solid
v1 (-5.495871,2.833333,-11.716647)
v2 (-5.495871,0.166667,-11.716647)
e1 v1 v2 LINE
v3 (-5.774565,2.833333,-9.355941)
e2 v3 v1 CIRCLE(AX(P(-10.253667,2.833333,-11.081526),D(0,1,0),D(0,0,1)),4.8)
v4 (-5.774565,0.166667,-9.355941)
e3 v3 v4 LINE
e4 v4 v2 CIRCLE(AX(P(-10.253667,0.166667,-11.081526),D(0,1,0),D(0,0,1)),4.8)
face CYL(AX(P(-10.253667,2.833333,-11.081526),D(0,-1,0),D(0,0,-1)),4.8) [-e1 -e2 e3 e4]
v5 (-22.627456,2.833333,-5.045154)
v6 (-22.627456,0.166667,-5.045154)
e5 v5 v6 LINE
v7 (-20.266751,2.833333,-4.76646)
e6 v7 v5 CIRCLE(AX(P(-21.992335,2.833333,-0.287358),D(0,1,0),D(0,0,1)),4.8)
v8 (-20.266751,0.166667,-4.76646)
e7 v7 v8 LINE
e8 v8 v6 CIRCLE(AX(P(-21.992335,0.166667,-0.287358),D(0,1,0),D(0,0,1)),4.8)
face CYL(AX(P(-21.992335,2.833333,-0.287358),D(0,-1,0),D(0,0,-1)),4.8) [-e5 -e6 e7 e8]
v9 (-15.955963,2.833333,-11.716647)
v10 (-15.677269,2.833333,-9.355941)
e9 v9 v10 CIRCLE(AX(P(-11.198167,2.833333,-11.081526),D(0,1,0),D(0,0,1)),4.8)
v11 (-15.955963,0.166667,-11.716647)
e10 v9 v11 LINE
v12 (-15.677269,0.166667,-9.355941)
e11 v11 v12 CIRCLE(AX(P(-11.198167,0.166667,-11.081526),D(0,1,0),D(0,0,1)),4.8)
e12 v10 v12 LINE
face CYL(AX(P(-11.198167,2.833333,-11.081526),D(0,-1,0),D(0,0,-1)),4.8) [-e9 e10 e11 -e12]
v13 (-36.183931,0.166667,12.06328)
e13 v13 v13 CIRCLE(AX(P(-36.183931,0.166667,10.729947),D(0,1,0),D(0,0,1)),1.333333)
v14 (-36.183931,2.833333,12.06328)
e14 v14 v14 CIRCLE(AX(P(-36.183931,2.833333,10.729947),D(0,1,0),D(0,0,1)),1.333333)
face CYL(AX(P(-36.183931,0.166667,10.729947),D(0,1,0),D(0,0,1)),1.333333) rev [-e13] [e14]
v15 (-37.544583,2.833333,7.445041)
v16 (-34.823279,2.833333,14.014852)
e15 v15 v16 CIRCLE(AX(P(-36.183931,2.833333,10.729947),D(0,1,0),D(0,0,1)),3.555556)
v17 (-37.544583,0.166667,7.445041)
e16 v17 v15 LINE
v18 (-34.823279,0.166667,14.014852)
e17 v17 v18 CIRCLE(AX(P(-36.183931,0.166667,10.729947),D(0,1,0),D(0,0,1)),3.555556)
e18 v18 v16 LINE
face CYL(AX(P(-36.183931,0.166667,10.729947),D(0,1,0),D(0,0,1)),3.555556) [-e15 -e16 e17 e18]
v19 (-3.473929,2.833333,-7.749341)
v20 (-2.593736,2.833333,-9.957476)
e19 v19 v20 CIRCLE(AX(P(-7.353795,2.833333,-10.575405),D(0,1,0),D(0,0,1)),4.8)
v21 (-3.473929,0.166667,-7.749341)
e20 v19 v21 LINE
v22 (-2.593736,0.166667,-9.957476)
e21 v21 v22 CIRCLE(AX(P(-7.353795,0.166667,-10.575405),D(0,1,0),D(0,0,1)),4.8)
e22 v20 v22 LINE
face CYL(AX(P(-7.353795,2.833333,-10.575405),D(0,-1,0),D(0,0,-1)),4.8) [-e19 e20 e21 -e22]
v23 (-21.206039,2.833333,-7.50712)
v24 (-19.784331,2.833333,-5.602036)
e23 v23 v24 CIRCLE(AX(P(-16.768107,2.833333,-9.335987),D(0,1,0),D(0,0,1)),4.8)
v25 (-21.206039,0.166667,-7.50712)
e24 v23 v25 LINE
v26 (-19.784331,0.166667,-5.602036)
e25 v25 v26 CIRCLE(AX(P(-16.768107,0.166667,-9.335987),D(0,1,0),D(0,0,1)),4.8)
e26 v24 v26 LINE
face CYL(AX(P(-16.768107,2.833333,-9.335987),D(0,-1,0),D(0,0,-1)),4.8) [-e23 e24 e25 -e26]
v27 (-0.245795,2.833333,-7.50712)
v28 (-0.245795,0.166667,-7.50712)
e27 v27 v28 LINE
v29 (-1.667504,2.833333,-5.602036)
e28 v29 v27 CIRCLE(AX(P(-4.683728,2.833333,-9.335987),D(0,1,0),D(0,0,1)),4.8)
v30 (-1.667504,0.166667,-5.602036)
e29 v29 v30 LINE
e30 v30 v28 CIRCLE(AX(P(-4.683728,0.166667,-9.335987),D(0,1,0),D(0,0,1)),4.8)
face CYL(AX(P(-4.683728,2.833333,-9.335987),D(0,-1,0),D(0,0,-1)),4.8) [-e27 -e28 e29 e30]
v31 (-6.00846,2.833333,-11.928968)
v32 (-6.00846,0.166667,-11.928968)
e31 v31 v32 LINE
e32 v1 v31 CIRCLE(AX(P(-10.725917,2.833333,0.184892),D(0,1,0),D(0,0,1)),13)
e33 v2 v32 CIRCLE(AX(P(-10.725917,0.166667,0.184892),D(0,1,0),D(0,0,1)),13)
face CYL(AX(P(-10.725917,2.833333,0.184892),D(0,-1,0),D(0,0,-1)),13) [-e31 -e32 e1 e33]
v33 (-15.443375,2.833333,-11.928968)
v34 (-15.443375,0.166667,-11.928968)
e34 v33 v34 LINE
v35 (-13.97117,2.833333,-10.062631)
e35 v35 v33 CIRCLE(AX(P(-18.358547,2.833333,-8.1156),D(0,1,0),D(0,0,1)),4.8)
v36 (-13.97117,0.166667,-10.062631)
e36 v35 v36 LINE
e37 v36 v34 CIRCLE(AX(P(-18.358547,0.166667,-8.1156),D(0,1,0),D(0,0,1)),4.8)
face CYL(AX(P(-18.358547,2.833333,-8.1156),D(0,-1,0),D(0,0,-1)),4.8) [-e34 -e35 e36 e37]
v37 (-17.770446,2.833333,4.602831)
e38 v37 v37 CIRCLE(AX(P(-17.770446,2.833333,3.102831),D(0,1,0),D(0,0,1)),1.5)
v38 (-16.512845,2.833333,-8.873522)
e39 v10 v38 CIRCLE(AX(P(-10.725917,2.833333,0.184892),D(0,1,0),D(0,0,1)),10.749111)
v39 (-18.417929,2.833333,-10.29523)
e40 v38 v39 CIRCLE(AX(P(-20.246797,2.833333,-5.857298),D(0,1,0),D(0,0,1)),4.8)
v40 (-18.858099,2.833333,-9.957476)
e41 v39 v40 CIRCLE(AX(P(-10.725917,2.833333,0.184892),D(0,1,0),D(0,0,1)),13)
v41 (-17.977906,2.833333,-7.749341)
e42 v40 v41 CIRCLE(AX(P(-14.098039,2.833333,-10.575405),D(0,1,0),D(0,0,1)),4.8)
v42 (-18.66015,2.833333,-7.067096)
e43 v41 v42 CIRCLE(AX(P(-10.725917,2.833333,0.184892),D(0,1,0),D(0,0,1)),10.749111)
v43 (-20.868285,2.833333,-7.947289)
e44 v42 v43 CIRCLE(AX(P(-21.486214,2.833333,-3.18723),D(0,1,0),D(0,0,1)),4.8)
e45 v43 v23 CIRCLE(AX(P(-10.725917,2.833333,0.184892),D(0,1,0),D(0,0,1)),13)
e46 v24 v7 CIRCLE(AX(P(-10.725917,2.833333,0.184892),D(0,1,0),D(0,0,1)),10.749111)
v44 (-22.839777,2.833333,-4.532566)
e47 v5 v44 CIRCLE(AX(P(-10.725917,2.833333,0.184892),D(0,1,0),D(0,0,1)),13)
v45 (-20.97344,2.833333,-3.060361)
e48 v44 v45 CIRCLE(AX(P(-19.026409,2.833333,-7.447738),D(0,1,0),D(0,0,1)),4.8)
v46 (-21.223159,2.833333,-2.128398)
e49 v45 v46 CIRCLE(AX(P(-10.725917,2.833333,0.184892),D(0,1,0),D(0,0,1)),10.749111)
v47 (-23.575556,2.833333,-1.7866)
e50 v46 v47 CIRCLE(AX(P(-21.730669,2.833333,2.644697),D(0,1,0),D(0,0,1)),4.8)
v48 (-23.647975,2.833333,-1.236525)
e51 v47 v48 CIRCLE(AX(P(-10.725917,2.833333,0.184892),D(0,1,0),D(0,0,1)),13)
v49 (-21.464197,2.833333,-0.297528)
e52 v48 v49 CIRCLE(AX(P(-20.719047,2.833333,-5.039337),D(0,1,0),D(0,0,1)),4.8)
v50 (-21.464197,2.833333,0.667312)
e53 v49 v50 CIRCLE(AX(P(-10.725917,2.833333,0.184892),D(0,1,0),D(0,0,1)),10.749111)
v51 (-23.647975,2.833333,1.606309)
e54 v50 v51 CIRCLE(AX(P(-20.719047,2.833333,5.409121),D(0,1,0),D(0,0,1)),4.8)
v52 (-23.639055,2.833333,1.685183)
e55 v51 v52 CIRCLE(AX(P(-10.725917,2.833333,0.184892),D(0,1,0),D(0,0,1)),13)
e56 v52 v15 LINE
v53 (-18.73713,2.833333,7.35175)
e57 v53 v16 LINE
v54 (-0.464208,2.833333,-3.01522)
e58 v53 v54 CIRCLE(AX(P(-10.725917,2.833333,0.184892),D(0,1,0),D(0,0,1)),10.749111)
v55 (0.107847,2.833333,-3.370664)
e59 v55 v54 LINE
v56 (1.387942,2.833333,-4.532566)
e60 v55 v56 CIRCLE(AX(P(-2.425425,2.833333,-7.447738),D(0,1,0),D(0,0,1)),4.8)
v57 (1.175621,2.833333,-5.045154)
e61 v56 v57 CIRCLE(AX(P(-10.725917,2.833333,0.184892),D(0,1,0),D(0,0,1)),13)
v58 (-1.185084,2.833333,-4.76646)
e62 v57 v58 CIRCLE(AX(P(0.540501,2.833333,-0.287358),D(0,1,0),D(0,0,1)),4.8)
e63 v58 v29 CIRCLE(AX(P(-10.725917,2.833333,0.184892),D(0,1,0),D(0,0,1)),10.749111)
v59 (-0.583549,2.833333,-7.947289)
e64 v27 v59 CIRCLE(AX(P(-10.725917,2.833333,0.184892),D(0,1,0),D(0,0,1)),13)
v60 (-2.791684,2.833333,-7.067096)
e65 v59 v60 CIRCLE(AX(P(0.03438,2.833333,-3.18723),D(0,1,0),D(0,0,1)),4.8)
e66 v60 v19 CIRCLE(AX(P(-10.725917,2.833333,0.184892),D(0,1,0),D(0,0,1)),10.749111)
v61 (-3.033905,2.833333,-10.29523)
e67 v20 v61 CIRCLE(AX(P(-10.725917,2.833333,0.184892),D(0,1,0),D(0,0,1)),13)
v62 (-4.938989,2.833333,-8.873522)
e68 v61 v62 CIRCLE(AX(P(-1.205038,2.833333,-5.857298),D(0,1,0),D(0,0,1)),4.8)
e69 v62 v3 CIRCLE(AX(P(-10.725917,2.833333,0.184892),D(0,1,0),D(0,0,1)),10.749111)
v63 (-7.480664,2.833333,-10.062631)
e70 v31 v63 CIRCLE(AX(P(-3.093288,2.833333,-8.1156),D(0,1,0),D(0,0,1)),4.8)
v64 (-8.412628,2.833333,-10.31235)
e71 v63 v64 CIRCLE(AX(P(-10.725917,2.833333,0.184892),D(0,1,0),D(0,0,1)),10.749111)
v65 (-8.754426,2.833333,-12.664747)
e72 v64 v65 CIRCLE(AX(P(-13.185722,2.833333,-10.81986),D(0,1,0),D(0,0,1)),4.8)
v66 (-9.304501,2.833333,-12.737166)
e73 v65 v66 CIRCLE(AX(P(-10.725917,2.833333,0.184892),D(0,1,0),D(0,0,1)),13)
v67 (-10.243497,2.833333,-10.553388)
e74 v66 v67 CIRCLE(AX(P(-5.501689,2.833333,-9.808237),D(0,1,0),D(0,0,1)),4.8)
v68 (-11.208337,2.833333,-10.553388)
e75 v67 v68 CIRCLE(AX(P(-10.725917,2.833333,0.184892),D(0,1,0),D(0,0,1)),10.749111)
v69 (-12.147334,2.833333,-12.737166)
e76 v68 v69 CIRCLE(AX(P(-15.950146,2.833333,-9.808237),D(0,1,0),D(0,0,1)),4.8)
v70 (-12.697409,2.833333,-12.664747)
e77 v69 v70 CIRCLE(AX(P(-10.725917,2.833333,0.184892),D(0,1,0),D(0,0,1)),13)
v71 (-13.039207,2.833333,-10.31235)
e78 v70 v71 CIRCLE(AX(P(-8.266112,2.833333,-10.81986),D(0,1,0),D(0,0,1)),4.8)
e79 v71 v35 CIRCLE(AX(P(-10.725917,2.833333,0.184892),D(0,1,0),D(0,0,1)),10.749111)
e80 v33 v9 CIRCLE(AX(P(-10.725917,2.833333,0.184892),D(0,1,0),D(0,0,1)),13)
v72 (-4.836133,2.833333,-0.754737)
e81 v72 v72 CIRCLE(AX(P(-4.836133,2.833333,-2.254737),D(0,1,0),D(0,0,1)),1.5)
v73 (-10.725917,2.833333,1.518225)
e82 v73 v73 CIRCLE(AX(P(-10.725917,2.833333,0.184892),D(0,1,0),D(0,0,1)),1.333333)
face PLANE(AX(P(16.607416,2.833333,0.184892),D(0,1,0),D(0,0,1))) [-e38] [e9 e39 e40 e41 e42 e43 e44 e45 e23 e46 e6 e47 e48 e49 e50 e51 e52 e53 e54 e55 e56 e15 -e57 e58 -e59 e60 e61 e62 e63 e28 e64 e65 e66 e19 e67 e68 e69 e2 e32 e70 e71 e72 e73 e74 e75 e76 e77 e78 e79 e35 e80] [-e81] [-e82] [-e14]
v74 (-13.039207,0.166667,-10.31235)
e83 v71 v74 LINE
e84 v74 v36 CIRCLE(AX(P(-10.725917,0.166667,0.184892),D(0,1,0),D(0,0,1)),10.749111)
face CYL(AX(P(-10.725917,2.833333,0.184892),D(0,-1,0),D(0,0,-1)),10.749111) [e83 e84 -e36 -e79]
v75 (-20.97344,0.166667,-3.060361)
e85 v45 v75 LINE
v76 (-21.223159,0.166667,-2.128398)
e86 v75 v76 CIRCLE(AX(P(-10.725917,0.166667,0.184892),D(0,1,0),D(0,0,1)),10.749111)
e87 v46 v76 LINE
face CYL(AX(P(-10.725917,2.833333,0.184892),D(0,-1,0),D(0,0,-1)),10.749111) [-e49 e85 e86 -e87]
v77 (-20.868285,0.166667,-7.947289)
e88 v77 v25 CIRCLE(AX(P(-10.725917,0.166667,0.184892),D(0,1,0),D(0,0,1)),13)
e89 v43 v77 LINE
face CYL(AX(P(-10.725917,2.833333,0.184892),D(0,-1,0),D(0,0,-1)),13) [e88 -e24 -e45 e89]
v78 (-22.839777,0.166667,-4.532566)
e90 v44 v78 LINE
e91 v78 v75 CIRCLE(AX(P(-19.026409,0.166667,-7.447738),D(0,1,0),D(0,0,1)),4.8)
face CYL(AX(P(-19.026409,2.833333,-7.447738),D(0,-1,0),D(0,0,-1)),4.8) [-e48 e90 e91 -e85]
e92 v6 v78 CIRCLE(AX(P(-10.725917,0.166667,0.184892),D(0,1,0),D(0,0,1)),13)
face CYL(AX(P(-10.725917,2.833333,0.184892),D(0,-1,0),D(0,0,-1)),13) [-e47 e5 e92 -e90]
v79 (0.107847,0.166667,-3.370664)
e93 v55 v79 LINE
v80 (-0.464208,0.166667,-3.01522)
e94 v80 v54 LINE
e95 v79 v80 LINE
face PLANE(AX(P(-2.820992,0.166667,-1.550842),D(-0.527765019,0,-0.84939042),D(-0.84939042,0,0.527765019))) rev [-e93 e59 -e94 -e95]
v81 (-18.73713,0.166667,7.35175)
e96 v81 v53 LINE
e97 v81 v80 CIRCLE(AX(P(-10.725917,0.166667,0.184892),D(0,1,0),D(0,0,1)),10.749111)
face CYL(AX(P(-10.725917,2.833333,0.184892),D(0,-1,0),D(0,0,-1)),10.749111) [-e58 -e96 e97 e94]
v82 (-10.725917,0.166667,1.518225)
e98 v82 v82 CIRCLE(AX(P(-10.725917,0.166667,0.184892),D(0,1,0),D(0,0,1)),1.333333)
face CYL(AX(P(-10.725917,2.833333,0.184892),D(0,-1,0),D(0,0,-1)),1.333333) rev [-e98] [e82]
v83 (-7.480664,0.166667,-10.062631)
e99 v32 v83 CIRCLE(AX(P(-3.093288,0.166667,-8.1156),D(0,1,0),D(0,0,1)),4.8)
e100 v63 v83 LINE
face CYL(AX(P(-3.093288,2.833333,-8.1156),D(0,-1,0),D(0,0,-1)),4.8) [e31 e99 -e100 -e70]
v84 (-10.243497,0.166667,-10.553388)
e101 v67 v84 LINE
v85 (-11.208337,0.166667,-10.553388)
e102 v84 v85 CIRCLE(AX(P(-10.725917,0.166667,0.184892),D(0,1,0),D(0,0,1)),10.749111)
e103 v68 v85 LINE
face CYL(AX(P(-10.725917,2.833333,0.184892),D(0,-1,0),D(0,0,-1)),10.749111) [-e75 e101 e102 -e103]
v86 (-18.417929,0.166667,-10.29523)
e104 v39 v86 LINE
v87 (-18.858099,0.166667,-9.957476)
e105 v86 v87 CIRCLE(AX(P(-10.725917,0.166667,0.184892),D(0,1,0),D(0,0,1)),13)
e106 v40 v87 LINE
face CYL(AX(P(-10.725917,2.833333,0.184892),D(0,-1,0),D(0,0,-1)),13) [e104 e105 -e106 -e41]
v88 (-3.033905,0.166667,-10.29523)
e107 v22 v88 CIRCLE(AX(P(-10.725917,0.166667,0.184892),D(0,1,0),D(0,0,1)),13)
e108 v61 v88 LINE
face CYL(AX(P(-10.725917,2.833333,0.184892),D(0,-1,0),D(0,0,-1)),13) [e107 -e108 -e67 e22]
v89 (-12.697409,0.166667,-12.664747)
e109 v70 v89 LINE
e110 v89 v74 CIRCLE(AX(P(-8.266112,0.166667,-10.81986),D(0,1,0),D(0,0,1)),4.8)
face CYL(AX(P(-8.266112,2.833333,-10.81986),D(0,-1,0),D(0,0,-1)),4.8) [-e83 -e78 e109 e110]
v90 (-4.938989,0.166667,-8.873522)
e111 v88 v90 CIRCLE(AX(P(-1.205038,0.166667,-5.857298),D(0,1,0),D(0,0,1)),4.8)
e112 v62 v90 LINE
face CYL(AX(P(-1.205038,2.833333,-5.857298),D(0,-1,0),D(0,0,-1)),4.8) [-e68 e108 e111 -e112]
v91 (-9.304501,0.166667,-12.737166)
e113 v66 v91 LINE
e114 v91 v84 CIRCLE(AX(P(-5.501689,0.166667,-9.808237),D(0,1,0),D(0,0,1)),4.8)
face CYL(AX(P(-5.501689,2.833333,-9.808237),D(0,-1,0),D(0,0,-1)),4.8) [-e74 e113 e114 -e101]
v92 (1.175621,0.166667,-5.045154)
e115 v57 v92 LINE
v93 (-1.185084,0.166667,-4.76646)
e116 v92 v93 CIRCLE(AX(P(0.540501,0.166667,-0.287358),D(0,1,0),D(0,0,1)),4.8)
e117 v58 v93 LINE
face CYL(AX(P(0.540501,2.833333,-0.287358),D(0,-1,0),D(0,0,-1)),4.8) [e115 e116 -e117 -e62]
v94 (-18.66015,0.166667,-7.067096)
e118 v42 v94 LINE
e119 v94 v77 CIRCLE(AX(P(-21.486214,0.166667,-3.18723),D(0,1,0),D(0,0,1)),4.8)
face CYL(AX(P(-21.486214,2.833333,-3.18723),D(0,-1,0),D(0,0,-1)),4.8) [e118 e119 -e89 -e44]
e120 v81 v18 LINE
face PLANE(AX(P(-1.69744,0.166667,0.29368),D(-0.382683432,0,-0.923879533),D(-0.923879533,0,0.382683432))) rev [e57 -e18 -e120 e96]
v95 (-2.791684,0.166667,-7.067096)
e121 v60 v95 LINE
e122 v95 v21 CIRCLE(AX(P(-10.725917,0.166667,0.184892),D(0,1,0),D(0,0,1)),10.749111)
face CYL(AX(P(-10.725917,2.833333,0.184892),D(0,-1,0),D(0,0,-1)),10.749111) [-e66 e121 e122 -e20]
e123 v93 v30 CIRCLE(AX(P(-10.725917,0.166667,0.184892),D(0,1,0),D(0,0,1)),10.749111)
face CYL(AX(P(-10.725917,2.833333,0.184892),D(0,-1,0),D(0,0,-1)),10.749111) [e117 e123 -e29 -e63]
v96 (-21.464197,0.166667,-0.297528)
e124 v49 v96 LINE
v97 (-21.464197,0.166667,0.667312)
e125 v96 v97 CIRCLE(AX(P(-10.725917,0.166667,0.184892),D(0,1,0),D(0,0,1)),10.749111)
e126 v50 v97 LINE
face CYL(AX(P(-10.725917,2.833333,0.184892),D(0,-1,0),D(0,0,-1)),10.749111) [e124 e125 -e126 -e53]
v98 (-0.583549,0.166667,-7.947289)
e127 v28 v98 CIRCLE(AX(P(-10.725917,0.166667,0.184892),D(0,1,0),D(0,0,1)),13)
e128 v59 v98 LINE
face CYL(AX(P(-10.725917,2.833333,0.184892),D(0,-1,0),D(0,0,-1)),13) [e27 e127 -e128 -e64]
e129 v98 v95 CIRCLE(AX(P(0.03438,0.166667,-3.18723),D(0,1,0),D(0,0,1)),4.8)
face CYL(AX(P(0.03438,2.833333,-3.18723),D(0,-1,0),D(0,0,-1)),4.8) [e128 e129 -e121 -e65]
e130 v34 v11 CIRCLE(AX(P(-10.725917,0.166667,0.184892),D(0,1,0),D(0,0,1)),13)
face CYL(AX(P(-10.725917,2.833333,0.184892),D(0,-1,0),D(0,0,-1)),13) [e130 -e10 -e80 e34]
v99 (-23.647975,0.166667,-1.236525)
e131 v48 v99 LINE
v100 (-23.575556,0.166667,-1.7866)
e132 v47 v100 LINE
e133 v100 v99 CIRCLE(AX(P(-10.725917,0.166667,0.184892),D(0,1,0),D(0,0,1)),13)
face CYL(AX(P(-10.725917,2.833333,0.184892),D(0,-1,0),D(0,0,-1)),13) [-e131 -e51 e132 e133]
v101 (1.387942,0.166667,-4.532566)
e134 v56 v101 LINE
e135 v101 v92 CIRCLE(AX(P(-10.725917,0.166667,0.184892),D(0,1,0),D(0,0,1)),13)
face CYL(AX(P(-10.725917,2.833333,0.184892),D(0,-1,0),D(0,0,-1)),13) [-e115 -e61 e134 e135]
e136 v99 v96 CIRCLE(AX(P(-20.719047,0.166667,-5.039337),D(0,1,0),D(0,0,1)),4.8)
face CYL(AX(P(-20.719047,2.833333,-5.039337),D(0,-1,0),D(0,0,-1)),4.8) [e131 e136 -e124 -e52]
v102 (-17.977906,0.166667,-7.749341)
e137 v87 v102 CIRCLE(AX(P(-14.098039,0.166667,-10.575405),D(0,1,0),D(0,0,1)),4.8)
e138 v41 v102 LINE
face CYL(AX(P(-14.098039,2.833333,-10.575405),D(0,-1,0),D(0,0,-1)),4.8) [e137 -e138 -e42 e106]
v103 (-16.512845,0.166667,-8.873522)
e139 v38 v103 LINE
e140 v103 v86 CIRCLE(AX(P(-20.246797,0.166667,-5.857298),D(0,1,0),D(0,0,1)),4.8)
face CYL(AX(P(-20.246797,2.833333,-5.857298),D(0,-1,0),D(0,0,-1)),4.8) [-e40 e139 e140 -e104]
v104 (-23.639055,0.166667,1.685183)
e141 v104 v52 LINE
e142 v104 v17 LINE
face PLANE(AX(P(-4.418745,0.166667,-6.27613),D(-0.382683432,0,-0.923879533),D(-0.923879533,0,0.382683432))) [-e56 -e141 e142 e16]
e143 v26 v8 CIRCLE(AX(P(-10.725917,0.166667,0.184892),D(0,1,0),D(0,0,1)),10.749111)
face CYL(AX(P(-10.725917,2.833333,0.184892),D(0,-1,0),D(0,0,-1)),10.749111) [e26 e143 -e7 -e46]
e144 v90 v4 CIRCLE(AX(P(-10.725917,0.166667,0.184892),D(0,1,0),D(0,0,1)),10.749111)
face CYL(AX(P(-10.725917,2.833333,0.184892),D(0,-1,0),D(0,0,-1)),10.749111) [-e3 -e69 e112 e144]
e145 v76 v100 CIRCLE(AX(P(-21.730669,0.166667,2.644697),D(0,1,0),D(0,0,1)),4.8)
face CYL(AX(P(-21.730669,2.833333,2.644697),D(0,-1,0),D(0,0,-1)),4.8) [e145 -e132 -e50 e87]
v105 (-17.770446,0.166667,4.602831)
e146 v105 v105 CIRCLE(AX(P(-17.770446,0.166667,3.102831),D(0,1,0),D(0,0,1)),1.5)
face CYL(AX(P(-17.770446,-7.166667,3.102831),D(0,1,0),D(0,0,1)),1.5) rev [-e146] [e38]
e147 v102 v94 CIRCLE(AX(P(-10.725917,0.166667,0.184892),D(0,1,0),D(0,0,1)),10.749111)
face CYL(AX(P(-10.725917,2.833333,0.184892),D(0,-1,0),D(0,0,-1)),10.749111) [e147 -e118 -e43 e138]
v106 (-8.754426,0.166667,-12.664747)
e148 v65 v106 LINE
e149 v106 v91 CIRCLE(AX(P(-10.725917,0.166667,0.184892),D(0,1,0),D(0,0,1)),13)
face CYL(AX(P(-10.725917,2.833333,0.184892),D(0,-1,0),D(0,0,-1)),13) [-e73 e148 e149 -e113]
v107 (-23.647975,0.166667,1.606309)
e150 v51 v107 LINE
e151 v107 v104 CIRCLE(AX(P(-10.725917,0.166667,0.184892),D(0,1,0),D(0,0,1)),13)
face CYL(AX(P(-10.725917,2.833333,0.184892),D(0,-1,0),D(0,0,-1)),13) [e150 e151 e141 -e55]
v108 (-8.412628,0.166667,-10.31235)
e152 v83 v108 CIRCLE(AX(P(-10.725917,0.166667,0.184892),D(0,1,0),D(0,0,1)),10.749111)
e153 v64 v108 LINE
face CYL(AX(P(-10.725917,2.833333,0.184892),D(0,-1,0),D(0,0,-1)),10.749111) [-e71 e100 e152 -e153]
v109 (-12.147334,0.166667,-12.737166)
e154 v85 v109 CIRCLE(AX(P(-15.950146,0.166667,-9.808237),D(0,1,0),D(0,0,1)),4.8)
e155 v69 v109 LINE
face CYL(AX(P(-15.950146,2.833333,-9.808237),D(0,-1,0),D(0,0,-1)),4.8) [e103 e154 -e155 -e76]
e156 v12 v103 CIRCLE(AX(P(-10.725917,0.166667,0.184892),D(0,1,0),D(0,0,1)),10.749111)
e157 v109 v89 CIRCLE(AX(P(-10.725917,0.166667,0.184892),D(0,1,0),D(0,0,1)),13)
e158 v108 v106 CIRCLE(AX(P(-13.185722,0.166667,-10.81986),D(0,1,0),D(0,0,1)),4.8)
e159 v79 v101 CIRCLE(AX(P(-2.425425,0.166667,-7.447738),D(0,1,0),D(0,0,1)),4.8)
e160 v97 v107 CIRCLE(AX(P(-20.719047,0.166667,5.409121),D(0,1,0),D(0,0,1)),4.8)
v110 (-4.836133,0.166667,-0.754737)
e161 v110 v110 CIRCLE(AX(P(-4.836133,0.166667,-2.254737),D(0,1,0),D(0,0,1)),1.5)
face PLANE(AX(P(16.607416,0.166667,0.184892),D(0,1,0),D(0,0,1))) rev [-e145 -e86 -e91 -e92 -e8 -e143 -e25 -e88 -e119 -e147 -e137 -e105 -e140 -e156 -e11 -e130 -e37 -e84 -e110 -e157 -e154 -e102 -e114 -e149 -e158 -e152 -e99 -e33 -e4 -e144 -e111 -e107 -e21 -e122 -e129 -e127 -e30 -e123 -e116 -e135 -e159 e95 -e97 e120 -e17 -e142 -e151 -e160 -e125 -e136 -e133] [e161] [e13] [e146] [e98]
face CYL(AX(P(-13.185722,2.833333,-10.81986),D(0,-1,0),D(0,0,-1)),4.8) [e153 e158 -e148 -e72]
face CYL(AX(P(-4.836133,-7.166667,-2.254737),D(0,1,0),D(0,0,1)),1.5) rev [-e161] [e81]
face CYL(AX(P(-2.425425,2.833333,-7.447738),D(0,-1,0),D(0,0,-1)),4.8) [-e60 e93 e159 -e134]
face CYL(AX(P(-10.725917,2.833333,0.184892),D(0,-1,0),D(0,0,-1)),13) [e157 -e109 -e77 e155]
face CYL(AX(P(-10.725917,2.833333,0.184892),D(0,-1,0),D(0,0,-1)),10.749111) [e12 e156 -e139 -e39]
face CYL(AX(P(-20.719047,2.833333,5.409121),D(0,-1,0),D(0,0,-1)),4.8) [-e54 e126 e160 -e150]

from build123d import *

# Parameters (mm, degrees)
SKETCH1_R              = 1.5
BOSS_EXTRUDE1_DEPTH    = 3
SKETCH3_R              = 1.5
BOSS_EXTRUDE2_DEPTH    = 3
CUT_EXTRUDE1_OUTLINE_R = 1.5
CUT_EXTRUDE1_DEPTH     = 3
SCALE1_SCALE           = 0.888888889
BOSS_EXTRUDE3_START    = -2.666666667
SKETCH5_R              = 1.333333333
BOSS_EXTRUDE3_DEPTH    = 2.666666667
SKETCH6_R              = 1.5
CUT_EXTRUDE2_DEPTH     = 10


# Read off the part's stored shape, not the designer's step: Cut-Extrude1
with BuildPart() as part:
    # Sketch1 → Boss-Extrude1 (new body)
    with BuildSketch(Plane(origin=(0, 0, 0), x_dir=(1, 0, 0), z_dir=(0, 1, 0))):
        with BuildLine():
            Line((20.643657446, 4), (2.081641936, 4))
            ThreePointArc((2.081641936, 4), (2.861028333, 4.588201733), (3.521749436, 5.30713988))
            ThreePointArc((3.521749436, 5.30713988), (3.405395609, 5.596745198), (3.282888305, 5.883801663))
            ThreePointArc((3.282888305, 5.883801663), (1.93527598, 5.894040025), (0.627094961, 5.57027124))
            ThreePointArc((0.627094961, 5.57027124), (0.366286148, 6.046375), (0.084372603, 6.510293938))
            ThreePointArc((0.084372603, 6.510293938), (1.018855105, 7.48132754), (1.683794586, 8.65351323))
            ThreePointArc((1.683794586, 8.65351323), (1.496450048, 8.903135899), (1.303821399, 9.148703928))
            ThreePointArc((1.303821399, 9.148703928), (-0.000522033, 8.809805691), (-1.180330337, 8.158486898))
            ThreePointArc((-1.180330337, 8.158486898), (-1.555477026, 8.550865528), (-1.947855656, 8.926012217))
            ThreePointArc((-1.947855656, 8.926012217), (-1.296536862, 10.105820521), (-0.957638625, 11.410163953))
            ThreePointArc((-0.957638625, 11.410163953), (-1.203206655, 11.602792602), (-1.452829324, 11.79013714))
            ThreePointArc((-1.452829324, 11.79013714), (-2.625015014, 11.125197659), (-3.596048616, 10.190715157))
            ThreePointArc((-3.596048616, 10.190715157), (-4.059967554, 10.472628702), (-4.536071314, 10.733437515))
            ThreePointArc((-4.536071314, 10.733437515), (-4.212302529, 12.041618533), (-4.222540891, 13.389230859))
            ThreePointArc((-4.222540891, 13.389230859), (-4.509597355, 13.511738163), (-4.799202674, 13.62809199))
            ThreePointArc((-4.799202674, 13.62809199), (-5.759348103, 12.682425791), (-6.455432668, 11.528463019))
            ThreePointArc((-6.455432668, 11.528463019), (-6.976508546, 11.680699536), (-7.503891752, 11.809396783))
            ThreePointArc((-7.503891752, 11.809396783), (-7.529737283, 13.156800143), (-7.888414517, 14.455843809))
            ThreePointArc((-7.888414517, 14.455843809), (-8.197396993, 14.499881098), (-8.507248835, 14.537314892))
            ThreePointArc((-8.507248835, 14.537314892), (-9.18992168, 13.375367565), (-9.563620196, 12.080565177))
            ThreePointArc((-9.563620196, 12.080565177), (-10.106342554, 12.09275), (-10.649064912, 12.080565177))
            ThreePointArc((-10.649064912, 12.080565177), (-11.022763428, 13.375367565), (-11.705436272, 14.537314892))
            ThreePointArc((-11.705436272, 14.537314892), (-12.015288115, 14.499881098), (-12.324270591, 14.455843809))
            ThreePointArc((-12.324270591, 14.455843809), (-12.682947825, 13.156800143), (-12.708793355, 11.809396783))
            ThreePointArc((-12.708793355, 11.809396783), (-13.236176561, 11.680699536), (-13.757252439, 11.528463019))
            ThreePointArc((-13.757252439, 11.528463019), (-14.453337005, 12.682425791), (-15.413482434, 13.62809199))
            ThreePointArc((-15.413482434, 13.62809199), (-15.703087752, 13.511738163), (-15.990144217, 13.389230859))
            ThreePointArc((-15.990144217, 13.389230859), (-16.000382579, 12.041618533), (-15.676613793, 10.733437515))
            ThreePointArc((-15.676613793, 10.733437515), (-16.152717554, 10.472628702), (-16.616636492, 10.190715157))
            ThreePointArc((-16.616636492, 10.190715157), (-17.587670094, 11.125197659), (-18.759855783, 11.79013714))
            ThreePointArc((-18.759855783, 11.79013714), (-19.009478453, 11.602792602), (-19.255046482, 11.410163953))
            ThreePointArc((-19.255046482, 11.410163953), (-18.916148245, 10.105820521), (-18.264829452, 8.926012217))
            ThreePointArc((-18.264829452, 8.926012217), (-18.657208082, 8.550865528), (-19.032354771, 8.158486898))
            ThreePointArc((-19.032354771, 8.158486898), (-20.212163074, 8.809805691), (-21.516506507, 9.148703928))
            ThreePointArc((-21.516506507, 9.148703928), (-21.709135156, 8.903135899), (-21.896479694, 8.65351323))
            ThreePointArc((-21.896479694, 8.65351323), (-21.231540213, 7.48132754), (-20.297057711, 6.510293938))
            ThreePointArc((-20.297057711, 6.510293938), (-20.578971255, 6.046375), (-20.839780068, 5.57027124))
            ThreePointArc((-20.839780068, 5.57027124), (-22.147961087, 5.894040025), (-23.495573413, 5.883801663))
            ThreePointArc((-23.495573413, 5.883801663), (-23.618080717, 5.596745198), (-23.734434544, 5.30713988))
            ThreePointArc((-23.734434544, 5.30713988), (-22.788768345, 4.346994451), (-21.634805572, 3.650909885))
            ThreePointArc((-21.634805572, 3.650909885), (-21.78704209, 3.129834008), (-21.915739337, 2.602450802))
            ThreePointArc((-21.915739337, 2.602450802), (-23.263142697, 2.576605271), (-24.562186363, 2.217928037))
            ThreePointArc((-24.562186363, 2.217928037), (-24.606223651, 1.908945561), (-24.643657446, 1.599093719))
            ThreePointArc((-24.643657446, 1.599093719), (-23.481710119, 0.916420874), (-22.186907731, 0.542722358))
            ThreePointArc((-22.186907731, 0.542722358), (-22.199092554, 0), (-22.186907731, -0.542722358))
            ThreePointArc((-22.186907731, -0.542722358), (-23.481710119, -0.916420874), (-24.643657446, -1.599093719))
            ThreePointArc((-24.643657446, -1.599093719), (-24.606223651, -1.908945561), (-24.562186363, -2.217928037))
            ThreePointArc((-24.562186363, -2.217928037), (-23.263142697, -2.576605271), (-21.915739337, -2.602450802))
            ThreePointArc((-21.915739337, -2.602450802), (-21.78704209, -3.129834008), (-21.634805572, -3.650909885))
            ThreePointArc((-21.634805572, -3.650909885), (-22.788768345, -4.346994451), (-23.734434544, -5.30713988))
            ThreePointArc((-23.734434544, -5.30713988), (-23.618080717, -5.596745198), (-23.495573413, -5.883801663))
            ThreePointArc((-23.495573413, -5.883801663), (-22.147961087, -5.894040025), (-20.839780068, -5.57027124))
            ThreePointArc((-20.839780068, -5.57027124), (-20.578971255, -6.046375), (-20.297057711, -6.510293938))
            ThreePointArc((-20.297057711, -6.510293938), (-21.231540213, -7.48132754), (-21.896479694, -8.65351323))
            ThreePointArc((-21.896479694, -8.65351323), (-21.709135156, -8.903135899), (-21.516506507, -9.148703928))
            ThreePointArc((-21.516506507, -9.148703928), (-20.212163074, -8.809805691), (-19.032354771, -8.158486898))
            ThreePointArc((-19.032354771, -8.158486898), (-18.657208082, -8.550865528), (-18.264829452, -8.926012217))
            ThreePointArc((-18.264829452, -8.926012217), (-18.916148245, -10.105820521), (-19.255046482, -11.410163953))
            ThreePointArc((-19.255046482, -11.410163953), (-19.009478453, -11.602792602), (-18.759855783, -11.79013714))
            ThreePointArc((-18.759855783, -11.79013714), (-17.587670094, -11.125197659), (-16.616636492, -10.190715157))
            ThreePointArc((-16.616636492, -10.190715157), (-16.152717554, -10.472628702), (-15.676613793, -10.733437515))
            ThreePointArc((-15.676613793, -10.733437515), (-16.000382579, -12.041618533), (-15.990144217, -13.389230859))
            ThreePointArc((-15.990144217, -13.389230859), (-15.703087752, -13.511738163), (-15.413482434, -13.62809199))
            ThreePointArc((-15.413482434, -13.62809199), (-14.453337005, -12.682425791), (-13.757252439, -11.528463019))
            ThreePointArc((-13.757252439, -11.528463019), (-13.236176561, -11.680699536), (-12.708793355, -11.809396783))
            ThreePointArc((-12.708793355, -11.809396783), (-12.682947825, -13.156800143), (-12.324270591, -14.455843809))
            ThreePointArc((-12.324270591, -14.455843809), (-12.015288115, -14.499881098), (-11.705436272, -14.537314892))
            ThreePointArc((-11.705436272, -14.537314892), (-11.022763428, -13.375367565), (-10.649064912, -12.080565177))
            ThreePointArc((-10.649064912, -12.080565177), (-10.106342554, -12.09275), (-9.563620196, -12.080565177))
            ThreePointArc((-9.563620196, -12.080565177), (-9.18992168, -13.375367565), (-8.507248835, -14.537314892))
            ThreePointArc((-8.507248835, -14.537314892), (-8.197396993, -14.499881098), (-7.888414517, -14.455843809))
            ThreePointArc((-7.888414517, -14.455843809), (-7.529737283, -13.156800143), (-7.503891752, -11.809396783))
            ThreePointArc((-7.503891752, -11.809396783), (-6.976508546, -11.680699536), (-6.455432668, -11.528463019))
            ThreePointArc((-6.455432668, -11.528463019), (-5.759348103, -12.682425791), (-4.799202674, -13.62809199))
            ThreePointArc((-4.799202674, -13.62809199), (-4.509597355, -13.511738163), (-4.222540891, -13.389230859))
            ThreePointArc((-4.222540891, -13.389230859), (-4.212302529, -12.041618533), (-4.536071314, -10.733437515))
            ThreePointArc((-4.536071314, -10.733437515), (-4.059967554, -10.472628702), (-3.596048616, -10.190715157))
            ThreePointArc((-3.596048616, -10.190715157), (-2.625015014, -11.125197659), (-1.452829324, -11.79013714))
            ThreePointArc((-1.452829324, -11.79013714), (-1.203206655, -11.602792602), (-0.957638625, -11.410163953))
            ThreePointArc((-0.957638625, -11.410163953), (-1.296536862, -10.105820521), (-1.947855656, -8.926012217))
            ThreePointArc((-1.947855656, -8.926012217), (-1.555477026, -8.550865528), (-1.180330337, -8.158486898))
            ThreePointArc((-1.180330337, -8.158486898), (-0.000522033, -8.809805691), (1.303821399, -9.148703928))
            ThreePointArc((1.303821399, -9.148703928), (1.496450048, -8.903135899), (1.683794586, -8.65351323))
            ThreePointArc((1.683794586, -8.65351323), (1.018855105, -7.48132754), (0.084372603, -6.510293938))
            ThreePointArc((0.084372603, -6.510293938), (0.366286148, -6.046375), (0.627094961, -5.57027124))
            ThreePointArc((0.627094961, -5.57027124), (1.93527598, -5.894040025), (3.282888305, -5.883801663))
            ThreePointArc((3.282888305, -5.883801663), (3.405395609, -5.596745198), (3.521749436, -5.30713988))
            ThreePointArc((3.521749436, -5.30713988), (2.861028333, -4.588201733), (2.081641936, -4))
            Line((2.081641936, -4), (20.643657446, -4))
            ThreePointArc((20.643657446, -4), (24.643657446, 0), (20.643657446, 4))
        make_face()
        with Locations(Location((-10.106342554, 0, 0), (0, 0, 270))):
            Circle(SKETCH1_R, mode=Mode.SUBTRACT)
        with Locations(Location((20.643657446, 0, 0), (0, 0, 270))):
            Circle(SKETCH1_R, mode=Mode.SUBTRACT)
    extrude(amount=BOSS_EXTRUDE1_DEPTH)

    # Sketch3 → Boss-Extrude2 (add)
    with BuildSketch(Plane(origin=(0, 3, 0), x_dir=(1, 0, 0), z_dir=(0, 1, 0))):
        with BuildLine():
            Line((-14.106342554, 0), (-20.558846273, 0))
            Line((-20.558846273, 0), (-40.277341791, -8.167668273))
            ThreePointArc((-40.277341791, -8.167668273), (-42.442126192, -13.393920133), (-37.215874332, -15.558704533))
            Line((-37.215874332, -15.558704533), (-8.575608824, -3.69551813))
            ThreePointArc((-8.575608824, -3.69551813), (-12.328623486, -3.325878449), (-14.106342554, 0))
        make_face()
        with Locations(Location((-38.746608062, -11.863186403, 0), (0, 0, 270))):
            Circle(SKETCH3_R, mode=Mode.SUBTRACT)
    extrude(amount=-BOSS_EXTRUDE2_DEPTH)

    # Cut-Extrude1 outline → Cut-Extrude1 (cut)
    # profile 1 of 11: a face of its own
    with BuildSketch(Plane(origin=(0, 0, 0), x_dir=(1, 0, 0), z_dir=(0, 1, 0))):
        with BuildLine():
            Line((2.081641936, 4), (1.43808022, 3.600125745))
            ThreePointArc((1.43808022, 3.600125745), (1.939395695, -1.065266441), (0.627094961, -5.57027124))
            ThreePointArc((0.627094961, -5.57027124), (1.93527598, -5.894040025), (3.282888305, -5.883801663))
            ThreePointArc((3.282888305, -5.883801663), (3.405395609, -5.596745198), (3.521749436, -5.30713988))
            ThreePointArc((3.521749436, -5.30713988), (2.861028333, -4.588201733), (2.081641936, -4))
            Line((2.081641936, -4), (20.643657446, -4))
            ThreePointArc((20.643657446, -4), (24.643657446, 0), (20.643657446, 4))
            Line((20.643657446, 4), (2.081641936, 4))
        make_face()
        with Locations((20.643657446, 0)):
            Circle(CUT_EXTRUDE1_OUTLINE_R, mode=Mode.SUBTRACT)
    # profile 2 of 11: a face of its own
    with BuildSketch(Plane(origin=(0, 0, 0), x_dir=(1, 0, 0), z_dir=(0, 1, 0))):
        with BuildLine():
            ThreePointArc((-21.516506507, -9.148703928), (-20.212163075, -8.809805691), (-19.032354771, -8.158486898))
            ThreePointArc((-19.032354771, -8.158486898), (-19.075783612, -8.110716964), (-19.118956803, -8.062715855))
            Line((-19.118956803, -8.062715855), (-21.572155055, -9.078863843))
            ThreePointArc((-21.572155055, -9.078863843), (-21.544384086, -9.113826359), (-21.516506507, -9.148703928))
        make_face()
    # profile 3 of 11: a face of its own
    with BuildSketch(Plane(origin=(0, 0, 0), x_dir=(1, 0, 0), z_dir=(0, 1, 0))):
        with BuildLine():
            ThreePointArc((-18.759855783, -11.79013714), (-17.587670094, -11.125197659), (-16.616636492, -10.190715157))
            ThreePointArc((-16.616636492, -10.190715157), (-17.467942325, -9.593823606), (-18.264829452, -8.926012217))
            ThreePointArc((-18.264829452, -8.926012217), (-18.916148245, -10.105820521), (-19.255046482, -11.410163953))
            ThreePointArc((-19.255046482, -11.410163953), (-19.009478453, -11.602792602), (-18.759855783, -11.79013714))
        make_face()
    # profile 4 of 11: a face of its own
    with BuildSketch(Plane(origin=(0, 0, 0), x_dir=(1, 0, 0), z_dir=(0, 1, 0))):
        with BuildLine():
            ThreePointArc((-15.413482434, -13.62809199), (-14.453337005, -12.682425791), (-13.757252439, -11.528463019))
            ThreePointArc((-13.757252439, -11.528463019), (-14.73403763, -11.172244217), (-15.676613793, -10.733437515))
            ThreePointArc((-15.676613793, -10.733437515), (-16.000382579, -12.041618533), (-15.990144217, -13.389230859))
            ThreePointArc((-15.990144217, -13.389230859), (-15.703087752, -13.511738163), (-15.413482434, -13.62809199))
        make_face()
    # profile 5 of 11: a face of its own
    with BuildSketch(Plane(origin=(0, 0, 0), x_dir=(1, 0, 0), z_dir=(0, 1, 0))):
        with BuildLine():
            ThreePointArc((-11.705436272, -14.537314892), (-11.022763428, -13.375367565), (-10.649064912, -12.080565177))
            ThreePointArc((-10.649064912, -12.080565177), (-11.684763165, -11.989294847), (-12.708793355, -11.809396783))
            ThreePointArc((-12.708793355, -11.809396783), (-12.682947825, -13.156800143), (-12.324270591, -14.455843809))
            ThreePointArc((-12.324270591, -14.455843809), (-12.015288115, -14.499881098), (-11.705436272, -14.537314892))
        make_face()
    # profile 6 of 11: a face of its own
    with BuildSketch(Plane(origin=(0, 0, 0), x_dir=(1, 0, 0), z_dir=(0, 1, 0))):
        with BuildLine():
            ThreePointArc((-7.888414517, -14.455843809), (-7.529737283, -13.156800143), (-7.503891752, -11.809396783))
            ThreePointArc((-7.503891752, -11.809396783), (-8.527921943, -11.989294847), (-9.563620196, -12.080565177))
            ThreePointArc((-9.563620196, -12.080565177), (-9.18992168, -13.375367565), (-8.507248835, -14.537314892))
            ThreePointArc((-8.507248835, -14.537314892), (-8.197396993, -14.499881098), (-7.888414517, -14.455843809))
        make_face()
    # profile 7 of 11: a face of its own
    with BuildSketch(Plane(origin=(0, 0, 0), x_dir=(1, 0, 0), z_dir=(0, 1, 0))):
        with BuildLine():
            ThreePointArc((-4.222540891, -13.389230859), (-4.212302529, -12.041618534), (-4.536071314, -10.733437515))
            ThreePointArc((-4.536071314, -10.733437515), (-5.478647477, -11.172244217), (-6.455432668, -11.528463019))
            ThreePointArc((-6.455432668, -11.528463019), (-5.759348103, -12.682425792), (-4.799202674, -13.62809199))
            ThreePointArc((-4.799202674, -13.62809199), (-4.509597356, -13.511738163), (-4.222540891, -13.389230859))
        make_face()
    # profile 8 of 11: a face of its own
    with BuildSketch(Plane(origin=(0, 0, 0), x_dir=(1, 0, 0), z_dir=(0, 1, 0))):
        with BuildLine():
            ThreePointArc((-0.957638625, -11.410163953), (-1.296536862, -10.105820521), (-1.947855656, -8.926012217))
            ThreePointArc((-1.947855656, -8.926012217), (-2.744742783, -9.593823606), (-3.596048616, -10.190715157))
            ThreePointArc((-3.596048616, -10.190715157), (-2.625015014, -11.125197659), (-1.452829324, -11.79013714))
            ThreePointArc((-1.452829324, -11.79013714), (-1.203206654, -11.602792602), (-0.957638625, -11.410163953))
        make_face()
    # profile 9 of 11: a face of its own
    with BuildSketch(Plane(origin=(0, 0, 0), x_dir=(1, 0, 0), z_dir=(0, 1, 0))):
        with BuildLine():
            ThreePointArc((1.683794586, -8.65351323), (1.018855105, -7.48132754), (0.084372603, -6.510293938))
            ThreePointArc((0.084372603, -6.510293938), (-0.512518948, -7.361599771), (-1.180330337, -8.158486898))
            ThreePointArc((-1.180330337, -8.158486898), (-0.000522033, -8.809805691), (1.303821399, -9.148703928))
            ThreePointArc((1.303821399, -9.148703928), (1.496450048, -8.903135899), (1.683794586, -8.65351323))
        make_face()
    # profile 10 of 11: a face of its own
    with BuildSketch(Plane(origin=(0, 0, 0), x_dir=(1, 0, 0), z_dir=(0, 1, 0))):
        with Locations((-16.573499281, -2.678784027)):
            Circle(CUT_EXTRUDE1_OUTLINE_R)
    # profile 11 of 11: a face of its own
    with BuildSketch(Plane(origin=(0, 0, 0), x_dir=(1, 0, 0), z_dir=(0, 1, 0))):
        with Locations((-3.639185826, 2.678784027)):
            Circle(CUT_EXTRUDE1_OUTLINE_R)
    extrude(amount=CUT_EXTRUDE1_DEPTH, mode=Mode.SUBTRACT)


with BuildPart() as part_1:
    # Scale1: scaled about (-15.682514655, 1.5, 1.664027293)
    add(part.part.scale(SCALE1_SCALE).moved(Location((-1.742501628, 0.166666667, 0.184891921))))

    # Sketch5 → Boss-Extrude3 (add)
    with BuildSketch(Plane(origin=(0, 2.833333333, 0), x_dir=(1, 0, 0), z_dir=(0, 1, 0)).offset(BOSS_EXTRUDE3_START)):
        with Locations((-16.47450099, -2.566033278)):
            Circle(SKETCH5_R)
        with Locations((-4.977333474, 2.196249436)):
            Circle(SKETCH5_R)
    extrude(amount=BOSS_EXTRUDE3_DEPTH)

    # Sketch6 → Cut-Extrude2 (cut)
    with BuildSketch(Plane(origin=(0, 2.833333333, 0), x_dir=(1, 0, 0), z_dir=(0, 1, 0))):
        with Locations(Location((-17.770445964, -3.102831263, 0), (0, 0, 270))):
            Circle(SKETCH6_R)
        with Locations(Location((-4.836132509, 2.25473679, 0), (0, 0, 270))):
            Circle(SKETCH6_R)
    extrude(amount=-CUT_EXTRUDE2_DEPTH, mode=Mode.SUBTRACT)


solid = part_1.part
